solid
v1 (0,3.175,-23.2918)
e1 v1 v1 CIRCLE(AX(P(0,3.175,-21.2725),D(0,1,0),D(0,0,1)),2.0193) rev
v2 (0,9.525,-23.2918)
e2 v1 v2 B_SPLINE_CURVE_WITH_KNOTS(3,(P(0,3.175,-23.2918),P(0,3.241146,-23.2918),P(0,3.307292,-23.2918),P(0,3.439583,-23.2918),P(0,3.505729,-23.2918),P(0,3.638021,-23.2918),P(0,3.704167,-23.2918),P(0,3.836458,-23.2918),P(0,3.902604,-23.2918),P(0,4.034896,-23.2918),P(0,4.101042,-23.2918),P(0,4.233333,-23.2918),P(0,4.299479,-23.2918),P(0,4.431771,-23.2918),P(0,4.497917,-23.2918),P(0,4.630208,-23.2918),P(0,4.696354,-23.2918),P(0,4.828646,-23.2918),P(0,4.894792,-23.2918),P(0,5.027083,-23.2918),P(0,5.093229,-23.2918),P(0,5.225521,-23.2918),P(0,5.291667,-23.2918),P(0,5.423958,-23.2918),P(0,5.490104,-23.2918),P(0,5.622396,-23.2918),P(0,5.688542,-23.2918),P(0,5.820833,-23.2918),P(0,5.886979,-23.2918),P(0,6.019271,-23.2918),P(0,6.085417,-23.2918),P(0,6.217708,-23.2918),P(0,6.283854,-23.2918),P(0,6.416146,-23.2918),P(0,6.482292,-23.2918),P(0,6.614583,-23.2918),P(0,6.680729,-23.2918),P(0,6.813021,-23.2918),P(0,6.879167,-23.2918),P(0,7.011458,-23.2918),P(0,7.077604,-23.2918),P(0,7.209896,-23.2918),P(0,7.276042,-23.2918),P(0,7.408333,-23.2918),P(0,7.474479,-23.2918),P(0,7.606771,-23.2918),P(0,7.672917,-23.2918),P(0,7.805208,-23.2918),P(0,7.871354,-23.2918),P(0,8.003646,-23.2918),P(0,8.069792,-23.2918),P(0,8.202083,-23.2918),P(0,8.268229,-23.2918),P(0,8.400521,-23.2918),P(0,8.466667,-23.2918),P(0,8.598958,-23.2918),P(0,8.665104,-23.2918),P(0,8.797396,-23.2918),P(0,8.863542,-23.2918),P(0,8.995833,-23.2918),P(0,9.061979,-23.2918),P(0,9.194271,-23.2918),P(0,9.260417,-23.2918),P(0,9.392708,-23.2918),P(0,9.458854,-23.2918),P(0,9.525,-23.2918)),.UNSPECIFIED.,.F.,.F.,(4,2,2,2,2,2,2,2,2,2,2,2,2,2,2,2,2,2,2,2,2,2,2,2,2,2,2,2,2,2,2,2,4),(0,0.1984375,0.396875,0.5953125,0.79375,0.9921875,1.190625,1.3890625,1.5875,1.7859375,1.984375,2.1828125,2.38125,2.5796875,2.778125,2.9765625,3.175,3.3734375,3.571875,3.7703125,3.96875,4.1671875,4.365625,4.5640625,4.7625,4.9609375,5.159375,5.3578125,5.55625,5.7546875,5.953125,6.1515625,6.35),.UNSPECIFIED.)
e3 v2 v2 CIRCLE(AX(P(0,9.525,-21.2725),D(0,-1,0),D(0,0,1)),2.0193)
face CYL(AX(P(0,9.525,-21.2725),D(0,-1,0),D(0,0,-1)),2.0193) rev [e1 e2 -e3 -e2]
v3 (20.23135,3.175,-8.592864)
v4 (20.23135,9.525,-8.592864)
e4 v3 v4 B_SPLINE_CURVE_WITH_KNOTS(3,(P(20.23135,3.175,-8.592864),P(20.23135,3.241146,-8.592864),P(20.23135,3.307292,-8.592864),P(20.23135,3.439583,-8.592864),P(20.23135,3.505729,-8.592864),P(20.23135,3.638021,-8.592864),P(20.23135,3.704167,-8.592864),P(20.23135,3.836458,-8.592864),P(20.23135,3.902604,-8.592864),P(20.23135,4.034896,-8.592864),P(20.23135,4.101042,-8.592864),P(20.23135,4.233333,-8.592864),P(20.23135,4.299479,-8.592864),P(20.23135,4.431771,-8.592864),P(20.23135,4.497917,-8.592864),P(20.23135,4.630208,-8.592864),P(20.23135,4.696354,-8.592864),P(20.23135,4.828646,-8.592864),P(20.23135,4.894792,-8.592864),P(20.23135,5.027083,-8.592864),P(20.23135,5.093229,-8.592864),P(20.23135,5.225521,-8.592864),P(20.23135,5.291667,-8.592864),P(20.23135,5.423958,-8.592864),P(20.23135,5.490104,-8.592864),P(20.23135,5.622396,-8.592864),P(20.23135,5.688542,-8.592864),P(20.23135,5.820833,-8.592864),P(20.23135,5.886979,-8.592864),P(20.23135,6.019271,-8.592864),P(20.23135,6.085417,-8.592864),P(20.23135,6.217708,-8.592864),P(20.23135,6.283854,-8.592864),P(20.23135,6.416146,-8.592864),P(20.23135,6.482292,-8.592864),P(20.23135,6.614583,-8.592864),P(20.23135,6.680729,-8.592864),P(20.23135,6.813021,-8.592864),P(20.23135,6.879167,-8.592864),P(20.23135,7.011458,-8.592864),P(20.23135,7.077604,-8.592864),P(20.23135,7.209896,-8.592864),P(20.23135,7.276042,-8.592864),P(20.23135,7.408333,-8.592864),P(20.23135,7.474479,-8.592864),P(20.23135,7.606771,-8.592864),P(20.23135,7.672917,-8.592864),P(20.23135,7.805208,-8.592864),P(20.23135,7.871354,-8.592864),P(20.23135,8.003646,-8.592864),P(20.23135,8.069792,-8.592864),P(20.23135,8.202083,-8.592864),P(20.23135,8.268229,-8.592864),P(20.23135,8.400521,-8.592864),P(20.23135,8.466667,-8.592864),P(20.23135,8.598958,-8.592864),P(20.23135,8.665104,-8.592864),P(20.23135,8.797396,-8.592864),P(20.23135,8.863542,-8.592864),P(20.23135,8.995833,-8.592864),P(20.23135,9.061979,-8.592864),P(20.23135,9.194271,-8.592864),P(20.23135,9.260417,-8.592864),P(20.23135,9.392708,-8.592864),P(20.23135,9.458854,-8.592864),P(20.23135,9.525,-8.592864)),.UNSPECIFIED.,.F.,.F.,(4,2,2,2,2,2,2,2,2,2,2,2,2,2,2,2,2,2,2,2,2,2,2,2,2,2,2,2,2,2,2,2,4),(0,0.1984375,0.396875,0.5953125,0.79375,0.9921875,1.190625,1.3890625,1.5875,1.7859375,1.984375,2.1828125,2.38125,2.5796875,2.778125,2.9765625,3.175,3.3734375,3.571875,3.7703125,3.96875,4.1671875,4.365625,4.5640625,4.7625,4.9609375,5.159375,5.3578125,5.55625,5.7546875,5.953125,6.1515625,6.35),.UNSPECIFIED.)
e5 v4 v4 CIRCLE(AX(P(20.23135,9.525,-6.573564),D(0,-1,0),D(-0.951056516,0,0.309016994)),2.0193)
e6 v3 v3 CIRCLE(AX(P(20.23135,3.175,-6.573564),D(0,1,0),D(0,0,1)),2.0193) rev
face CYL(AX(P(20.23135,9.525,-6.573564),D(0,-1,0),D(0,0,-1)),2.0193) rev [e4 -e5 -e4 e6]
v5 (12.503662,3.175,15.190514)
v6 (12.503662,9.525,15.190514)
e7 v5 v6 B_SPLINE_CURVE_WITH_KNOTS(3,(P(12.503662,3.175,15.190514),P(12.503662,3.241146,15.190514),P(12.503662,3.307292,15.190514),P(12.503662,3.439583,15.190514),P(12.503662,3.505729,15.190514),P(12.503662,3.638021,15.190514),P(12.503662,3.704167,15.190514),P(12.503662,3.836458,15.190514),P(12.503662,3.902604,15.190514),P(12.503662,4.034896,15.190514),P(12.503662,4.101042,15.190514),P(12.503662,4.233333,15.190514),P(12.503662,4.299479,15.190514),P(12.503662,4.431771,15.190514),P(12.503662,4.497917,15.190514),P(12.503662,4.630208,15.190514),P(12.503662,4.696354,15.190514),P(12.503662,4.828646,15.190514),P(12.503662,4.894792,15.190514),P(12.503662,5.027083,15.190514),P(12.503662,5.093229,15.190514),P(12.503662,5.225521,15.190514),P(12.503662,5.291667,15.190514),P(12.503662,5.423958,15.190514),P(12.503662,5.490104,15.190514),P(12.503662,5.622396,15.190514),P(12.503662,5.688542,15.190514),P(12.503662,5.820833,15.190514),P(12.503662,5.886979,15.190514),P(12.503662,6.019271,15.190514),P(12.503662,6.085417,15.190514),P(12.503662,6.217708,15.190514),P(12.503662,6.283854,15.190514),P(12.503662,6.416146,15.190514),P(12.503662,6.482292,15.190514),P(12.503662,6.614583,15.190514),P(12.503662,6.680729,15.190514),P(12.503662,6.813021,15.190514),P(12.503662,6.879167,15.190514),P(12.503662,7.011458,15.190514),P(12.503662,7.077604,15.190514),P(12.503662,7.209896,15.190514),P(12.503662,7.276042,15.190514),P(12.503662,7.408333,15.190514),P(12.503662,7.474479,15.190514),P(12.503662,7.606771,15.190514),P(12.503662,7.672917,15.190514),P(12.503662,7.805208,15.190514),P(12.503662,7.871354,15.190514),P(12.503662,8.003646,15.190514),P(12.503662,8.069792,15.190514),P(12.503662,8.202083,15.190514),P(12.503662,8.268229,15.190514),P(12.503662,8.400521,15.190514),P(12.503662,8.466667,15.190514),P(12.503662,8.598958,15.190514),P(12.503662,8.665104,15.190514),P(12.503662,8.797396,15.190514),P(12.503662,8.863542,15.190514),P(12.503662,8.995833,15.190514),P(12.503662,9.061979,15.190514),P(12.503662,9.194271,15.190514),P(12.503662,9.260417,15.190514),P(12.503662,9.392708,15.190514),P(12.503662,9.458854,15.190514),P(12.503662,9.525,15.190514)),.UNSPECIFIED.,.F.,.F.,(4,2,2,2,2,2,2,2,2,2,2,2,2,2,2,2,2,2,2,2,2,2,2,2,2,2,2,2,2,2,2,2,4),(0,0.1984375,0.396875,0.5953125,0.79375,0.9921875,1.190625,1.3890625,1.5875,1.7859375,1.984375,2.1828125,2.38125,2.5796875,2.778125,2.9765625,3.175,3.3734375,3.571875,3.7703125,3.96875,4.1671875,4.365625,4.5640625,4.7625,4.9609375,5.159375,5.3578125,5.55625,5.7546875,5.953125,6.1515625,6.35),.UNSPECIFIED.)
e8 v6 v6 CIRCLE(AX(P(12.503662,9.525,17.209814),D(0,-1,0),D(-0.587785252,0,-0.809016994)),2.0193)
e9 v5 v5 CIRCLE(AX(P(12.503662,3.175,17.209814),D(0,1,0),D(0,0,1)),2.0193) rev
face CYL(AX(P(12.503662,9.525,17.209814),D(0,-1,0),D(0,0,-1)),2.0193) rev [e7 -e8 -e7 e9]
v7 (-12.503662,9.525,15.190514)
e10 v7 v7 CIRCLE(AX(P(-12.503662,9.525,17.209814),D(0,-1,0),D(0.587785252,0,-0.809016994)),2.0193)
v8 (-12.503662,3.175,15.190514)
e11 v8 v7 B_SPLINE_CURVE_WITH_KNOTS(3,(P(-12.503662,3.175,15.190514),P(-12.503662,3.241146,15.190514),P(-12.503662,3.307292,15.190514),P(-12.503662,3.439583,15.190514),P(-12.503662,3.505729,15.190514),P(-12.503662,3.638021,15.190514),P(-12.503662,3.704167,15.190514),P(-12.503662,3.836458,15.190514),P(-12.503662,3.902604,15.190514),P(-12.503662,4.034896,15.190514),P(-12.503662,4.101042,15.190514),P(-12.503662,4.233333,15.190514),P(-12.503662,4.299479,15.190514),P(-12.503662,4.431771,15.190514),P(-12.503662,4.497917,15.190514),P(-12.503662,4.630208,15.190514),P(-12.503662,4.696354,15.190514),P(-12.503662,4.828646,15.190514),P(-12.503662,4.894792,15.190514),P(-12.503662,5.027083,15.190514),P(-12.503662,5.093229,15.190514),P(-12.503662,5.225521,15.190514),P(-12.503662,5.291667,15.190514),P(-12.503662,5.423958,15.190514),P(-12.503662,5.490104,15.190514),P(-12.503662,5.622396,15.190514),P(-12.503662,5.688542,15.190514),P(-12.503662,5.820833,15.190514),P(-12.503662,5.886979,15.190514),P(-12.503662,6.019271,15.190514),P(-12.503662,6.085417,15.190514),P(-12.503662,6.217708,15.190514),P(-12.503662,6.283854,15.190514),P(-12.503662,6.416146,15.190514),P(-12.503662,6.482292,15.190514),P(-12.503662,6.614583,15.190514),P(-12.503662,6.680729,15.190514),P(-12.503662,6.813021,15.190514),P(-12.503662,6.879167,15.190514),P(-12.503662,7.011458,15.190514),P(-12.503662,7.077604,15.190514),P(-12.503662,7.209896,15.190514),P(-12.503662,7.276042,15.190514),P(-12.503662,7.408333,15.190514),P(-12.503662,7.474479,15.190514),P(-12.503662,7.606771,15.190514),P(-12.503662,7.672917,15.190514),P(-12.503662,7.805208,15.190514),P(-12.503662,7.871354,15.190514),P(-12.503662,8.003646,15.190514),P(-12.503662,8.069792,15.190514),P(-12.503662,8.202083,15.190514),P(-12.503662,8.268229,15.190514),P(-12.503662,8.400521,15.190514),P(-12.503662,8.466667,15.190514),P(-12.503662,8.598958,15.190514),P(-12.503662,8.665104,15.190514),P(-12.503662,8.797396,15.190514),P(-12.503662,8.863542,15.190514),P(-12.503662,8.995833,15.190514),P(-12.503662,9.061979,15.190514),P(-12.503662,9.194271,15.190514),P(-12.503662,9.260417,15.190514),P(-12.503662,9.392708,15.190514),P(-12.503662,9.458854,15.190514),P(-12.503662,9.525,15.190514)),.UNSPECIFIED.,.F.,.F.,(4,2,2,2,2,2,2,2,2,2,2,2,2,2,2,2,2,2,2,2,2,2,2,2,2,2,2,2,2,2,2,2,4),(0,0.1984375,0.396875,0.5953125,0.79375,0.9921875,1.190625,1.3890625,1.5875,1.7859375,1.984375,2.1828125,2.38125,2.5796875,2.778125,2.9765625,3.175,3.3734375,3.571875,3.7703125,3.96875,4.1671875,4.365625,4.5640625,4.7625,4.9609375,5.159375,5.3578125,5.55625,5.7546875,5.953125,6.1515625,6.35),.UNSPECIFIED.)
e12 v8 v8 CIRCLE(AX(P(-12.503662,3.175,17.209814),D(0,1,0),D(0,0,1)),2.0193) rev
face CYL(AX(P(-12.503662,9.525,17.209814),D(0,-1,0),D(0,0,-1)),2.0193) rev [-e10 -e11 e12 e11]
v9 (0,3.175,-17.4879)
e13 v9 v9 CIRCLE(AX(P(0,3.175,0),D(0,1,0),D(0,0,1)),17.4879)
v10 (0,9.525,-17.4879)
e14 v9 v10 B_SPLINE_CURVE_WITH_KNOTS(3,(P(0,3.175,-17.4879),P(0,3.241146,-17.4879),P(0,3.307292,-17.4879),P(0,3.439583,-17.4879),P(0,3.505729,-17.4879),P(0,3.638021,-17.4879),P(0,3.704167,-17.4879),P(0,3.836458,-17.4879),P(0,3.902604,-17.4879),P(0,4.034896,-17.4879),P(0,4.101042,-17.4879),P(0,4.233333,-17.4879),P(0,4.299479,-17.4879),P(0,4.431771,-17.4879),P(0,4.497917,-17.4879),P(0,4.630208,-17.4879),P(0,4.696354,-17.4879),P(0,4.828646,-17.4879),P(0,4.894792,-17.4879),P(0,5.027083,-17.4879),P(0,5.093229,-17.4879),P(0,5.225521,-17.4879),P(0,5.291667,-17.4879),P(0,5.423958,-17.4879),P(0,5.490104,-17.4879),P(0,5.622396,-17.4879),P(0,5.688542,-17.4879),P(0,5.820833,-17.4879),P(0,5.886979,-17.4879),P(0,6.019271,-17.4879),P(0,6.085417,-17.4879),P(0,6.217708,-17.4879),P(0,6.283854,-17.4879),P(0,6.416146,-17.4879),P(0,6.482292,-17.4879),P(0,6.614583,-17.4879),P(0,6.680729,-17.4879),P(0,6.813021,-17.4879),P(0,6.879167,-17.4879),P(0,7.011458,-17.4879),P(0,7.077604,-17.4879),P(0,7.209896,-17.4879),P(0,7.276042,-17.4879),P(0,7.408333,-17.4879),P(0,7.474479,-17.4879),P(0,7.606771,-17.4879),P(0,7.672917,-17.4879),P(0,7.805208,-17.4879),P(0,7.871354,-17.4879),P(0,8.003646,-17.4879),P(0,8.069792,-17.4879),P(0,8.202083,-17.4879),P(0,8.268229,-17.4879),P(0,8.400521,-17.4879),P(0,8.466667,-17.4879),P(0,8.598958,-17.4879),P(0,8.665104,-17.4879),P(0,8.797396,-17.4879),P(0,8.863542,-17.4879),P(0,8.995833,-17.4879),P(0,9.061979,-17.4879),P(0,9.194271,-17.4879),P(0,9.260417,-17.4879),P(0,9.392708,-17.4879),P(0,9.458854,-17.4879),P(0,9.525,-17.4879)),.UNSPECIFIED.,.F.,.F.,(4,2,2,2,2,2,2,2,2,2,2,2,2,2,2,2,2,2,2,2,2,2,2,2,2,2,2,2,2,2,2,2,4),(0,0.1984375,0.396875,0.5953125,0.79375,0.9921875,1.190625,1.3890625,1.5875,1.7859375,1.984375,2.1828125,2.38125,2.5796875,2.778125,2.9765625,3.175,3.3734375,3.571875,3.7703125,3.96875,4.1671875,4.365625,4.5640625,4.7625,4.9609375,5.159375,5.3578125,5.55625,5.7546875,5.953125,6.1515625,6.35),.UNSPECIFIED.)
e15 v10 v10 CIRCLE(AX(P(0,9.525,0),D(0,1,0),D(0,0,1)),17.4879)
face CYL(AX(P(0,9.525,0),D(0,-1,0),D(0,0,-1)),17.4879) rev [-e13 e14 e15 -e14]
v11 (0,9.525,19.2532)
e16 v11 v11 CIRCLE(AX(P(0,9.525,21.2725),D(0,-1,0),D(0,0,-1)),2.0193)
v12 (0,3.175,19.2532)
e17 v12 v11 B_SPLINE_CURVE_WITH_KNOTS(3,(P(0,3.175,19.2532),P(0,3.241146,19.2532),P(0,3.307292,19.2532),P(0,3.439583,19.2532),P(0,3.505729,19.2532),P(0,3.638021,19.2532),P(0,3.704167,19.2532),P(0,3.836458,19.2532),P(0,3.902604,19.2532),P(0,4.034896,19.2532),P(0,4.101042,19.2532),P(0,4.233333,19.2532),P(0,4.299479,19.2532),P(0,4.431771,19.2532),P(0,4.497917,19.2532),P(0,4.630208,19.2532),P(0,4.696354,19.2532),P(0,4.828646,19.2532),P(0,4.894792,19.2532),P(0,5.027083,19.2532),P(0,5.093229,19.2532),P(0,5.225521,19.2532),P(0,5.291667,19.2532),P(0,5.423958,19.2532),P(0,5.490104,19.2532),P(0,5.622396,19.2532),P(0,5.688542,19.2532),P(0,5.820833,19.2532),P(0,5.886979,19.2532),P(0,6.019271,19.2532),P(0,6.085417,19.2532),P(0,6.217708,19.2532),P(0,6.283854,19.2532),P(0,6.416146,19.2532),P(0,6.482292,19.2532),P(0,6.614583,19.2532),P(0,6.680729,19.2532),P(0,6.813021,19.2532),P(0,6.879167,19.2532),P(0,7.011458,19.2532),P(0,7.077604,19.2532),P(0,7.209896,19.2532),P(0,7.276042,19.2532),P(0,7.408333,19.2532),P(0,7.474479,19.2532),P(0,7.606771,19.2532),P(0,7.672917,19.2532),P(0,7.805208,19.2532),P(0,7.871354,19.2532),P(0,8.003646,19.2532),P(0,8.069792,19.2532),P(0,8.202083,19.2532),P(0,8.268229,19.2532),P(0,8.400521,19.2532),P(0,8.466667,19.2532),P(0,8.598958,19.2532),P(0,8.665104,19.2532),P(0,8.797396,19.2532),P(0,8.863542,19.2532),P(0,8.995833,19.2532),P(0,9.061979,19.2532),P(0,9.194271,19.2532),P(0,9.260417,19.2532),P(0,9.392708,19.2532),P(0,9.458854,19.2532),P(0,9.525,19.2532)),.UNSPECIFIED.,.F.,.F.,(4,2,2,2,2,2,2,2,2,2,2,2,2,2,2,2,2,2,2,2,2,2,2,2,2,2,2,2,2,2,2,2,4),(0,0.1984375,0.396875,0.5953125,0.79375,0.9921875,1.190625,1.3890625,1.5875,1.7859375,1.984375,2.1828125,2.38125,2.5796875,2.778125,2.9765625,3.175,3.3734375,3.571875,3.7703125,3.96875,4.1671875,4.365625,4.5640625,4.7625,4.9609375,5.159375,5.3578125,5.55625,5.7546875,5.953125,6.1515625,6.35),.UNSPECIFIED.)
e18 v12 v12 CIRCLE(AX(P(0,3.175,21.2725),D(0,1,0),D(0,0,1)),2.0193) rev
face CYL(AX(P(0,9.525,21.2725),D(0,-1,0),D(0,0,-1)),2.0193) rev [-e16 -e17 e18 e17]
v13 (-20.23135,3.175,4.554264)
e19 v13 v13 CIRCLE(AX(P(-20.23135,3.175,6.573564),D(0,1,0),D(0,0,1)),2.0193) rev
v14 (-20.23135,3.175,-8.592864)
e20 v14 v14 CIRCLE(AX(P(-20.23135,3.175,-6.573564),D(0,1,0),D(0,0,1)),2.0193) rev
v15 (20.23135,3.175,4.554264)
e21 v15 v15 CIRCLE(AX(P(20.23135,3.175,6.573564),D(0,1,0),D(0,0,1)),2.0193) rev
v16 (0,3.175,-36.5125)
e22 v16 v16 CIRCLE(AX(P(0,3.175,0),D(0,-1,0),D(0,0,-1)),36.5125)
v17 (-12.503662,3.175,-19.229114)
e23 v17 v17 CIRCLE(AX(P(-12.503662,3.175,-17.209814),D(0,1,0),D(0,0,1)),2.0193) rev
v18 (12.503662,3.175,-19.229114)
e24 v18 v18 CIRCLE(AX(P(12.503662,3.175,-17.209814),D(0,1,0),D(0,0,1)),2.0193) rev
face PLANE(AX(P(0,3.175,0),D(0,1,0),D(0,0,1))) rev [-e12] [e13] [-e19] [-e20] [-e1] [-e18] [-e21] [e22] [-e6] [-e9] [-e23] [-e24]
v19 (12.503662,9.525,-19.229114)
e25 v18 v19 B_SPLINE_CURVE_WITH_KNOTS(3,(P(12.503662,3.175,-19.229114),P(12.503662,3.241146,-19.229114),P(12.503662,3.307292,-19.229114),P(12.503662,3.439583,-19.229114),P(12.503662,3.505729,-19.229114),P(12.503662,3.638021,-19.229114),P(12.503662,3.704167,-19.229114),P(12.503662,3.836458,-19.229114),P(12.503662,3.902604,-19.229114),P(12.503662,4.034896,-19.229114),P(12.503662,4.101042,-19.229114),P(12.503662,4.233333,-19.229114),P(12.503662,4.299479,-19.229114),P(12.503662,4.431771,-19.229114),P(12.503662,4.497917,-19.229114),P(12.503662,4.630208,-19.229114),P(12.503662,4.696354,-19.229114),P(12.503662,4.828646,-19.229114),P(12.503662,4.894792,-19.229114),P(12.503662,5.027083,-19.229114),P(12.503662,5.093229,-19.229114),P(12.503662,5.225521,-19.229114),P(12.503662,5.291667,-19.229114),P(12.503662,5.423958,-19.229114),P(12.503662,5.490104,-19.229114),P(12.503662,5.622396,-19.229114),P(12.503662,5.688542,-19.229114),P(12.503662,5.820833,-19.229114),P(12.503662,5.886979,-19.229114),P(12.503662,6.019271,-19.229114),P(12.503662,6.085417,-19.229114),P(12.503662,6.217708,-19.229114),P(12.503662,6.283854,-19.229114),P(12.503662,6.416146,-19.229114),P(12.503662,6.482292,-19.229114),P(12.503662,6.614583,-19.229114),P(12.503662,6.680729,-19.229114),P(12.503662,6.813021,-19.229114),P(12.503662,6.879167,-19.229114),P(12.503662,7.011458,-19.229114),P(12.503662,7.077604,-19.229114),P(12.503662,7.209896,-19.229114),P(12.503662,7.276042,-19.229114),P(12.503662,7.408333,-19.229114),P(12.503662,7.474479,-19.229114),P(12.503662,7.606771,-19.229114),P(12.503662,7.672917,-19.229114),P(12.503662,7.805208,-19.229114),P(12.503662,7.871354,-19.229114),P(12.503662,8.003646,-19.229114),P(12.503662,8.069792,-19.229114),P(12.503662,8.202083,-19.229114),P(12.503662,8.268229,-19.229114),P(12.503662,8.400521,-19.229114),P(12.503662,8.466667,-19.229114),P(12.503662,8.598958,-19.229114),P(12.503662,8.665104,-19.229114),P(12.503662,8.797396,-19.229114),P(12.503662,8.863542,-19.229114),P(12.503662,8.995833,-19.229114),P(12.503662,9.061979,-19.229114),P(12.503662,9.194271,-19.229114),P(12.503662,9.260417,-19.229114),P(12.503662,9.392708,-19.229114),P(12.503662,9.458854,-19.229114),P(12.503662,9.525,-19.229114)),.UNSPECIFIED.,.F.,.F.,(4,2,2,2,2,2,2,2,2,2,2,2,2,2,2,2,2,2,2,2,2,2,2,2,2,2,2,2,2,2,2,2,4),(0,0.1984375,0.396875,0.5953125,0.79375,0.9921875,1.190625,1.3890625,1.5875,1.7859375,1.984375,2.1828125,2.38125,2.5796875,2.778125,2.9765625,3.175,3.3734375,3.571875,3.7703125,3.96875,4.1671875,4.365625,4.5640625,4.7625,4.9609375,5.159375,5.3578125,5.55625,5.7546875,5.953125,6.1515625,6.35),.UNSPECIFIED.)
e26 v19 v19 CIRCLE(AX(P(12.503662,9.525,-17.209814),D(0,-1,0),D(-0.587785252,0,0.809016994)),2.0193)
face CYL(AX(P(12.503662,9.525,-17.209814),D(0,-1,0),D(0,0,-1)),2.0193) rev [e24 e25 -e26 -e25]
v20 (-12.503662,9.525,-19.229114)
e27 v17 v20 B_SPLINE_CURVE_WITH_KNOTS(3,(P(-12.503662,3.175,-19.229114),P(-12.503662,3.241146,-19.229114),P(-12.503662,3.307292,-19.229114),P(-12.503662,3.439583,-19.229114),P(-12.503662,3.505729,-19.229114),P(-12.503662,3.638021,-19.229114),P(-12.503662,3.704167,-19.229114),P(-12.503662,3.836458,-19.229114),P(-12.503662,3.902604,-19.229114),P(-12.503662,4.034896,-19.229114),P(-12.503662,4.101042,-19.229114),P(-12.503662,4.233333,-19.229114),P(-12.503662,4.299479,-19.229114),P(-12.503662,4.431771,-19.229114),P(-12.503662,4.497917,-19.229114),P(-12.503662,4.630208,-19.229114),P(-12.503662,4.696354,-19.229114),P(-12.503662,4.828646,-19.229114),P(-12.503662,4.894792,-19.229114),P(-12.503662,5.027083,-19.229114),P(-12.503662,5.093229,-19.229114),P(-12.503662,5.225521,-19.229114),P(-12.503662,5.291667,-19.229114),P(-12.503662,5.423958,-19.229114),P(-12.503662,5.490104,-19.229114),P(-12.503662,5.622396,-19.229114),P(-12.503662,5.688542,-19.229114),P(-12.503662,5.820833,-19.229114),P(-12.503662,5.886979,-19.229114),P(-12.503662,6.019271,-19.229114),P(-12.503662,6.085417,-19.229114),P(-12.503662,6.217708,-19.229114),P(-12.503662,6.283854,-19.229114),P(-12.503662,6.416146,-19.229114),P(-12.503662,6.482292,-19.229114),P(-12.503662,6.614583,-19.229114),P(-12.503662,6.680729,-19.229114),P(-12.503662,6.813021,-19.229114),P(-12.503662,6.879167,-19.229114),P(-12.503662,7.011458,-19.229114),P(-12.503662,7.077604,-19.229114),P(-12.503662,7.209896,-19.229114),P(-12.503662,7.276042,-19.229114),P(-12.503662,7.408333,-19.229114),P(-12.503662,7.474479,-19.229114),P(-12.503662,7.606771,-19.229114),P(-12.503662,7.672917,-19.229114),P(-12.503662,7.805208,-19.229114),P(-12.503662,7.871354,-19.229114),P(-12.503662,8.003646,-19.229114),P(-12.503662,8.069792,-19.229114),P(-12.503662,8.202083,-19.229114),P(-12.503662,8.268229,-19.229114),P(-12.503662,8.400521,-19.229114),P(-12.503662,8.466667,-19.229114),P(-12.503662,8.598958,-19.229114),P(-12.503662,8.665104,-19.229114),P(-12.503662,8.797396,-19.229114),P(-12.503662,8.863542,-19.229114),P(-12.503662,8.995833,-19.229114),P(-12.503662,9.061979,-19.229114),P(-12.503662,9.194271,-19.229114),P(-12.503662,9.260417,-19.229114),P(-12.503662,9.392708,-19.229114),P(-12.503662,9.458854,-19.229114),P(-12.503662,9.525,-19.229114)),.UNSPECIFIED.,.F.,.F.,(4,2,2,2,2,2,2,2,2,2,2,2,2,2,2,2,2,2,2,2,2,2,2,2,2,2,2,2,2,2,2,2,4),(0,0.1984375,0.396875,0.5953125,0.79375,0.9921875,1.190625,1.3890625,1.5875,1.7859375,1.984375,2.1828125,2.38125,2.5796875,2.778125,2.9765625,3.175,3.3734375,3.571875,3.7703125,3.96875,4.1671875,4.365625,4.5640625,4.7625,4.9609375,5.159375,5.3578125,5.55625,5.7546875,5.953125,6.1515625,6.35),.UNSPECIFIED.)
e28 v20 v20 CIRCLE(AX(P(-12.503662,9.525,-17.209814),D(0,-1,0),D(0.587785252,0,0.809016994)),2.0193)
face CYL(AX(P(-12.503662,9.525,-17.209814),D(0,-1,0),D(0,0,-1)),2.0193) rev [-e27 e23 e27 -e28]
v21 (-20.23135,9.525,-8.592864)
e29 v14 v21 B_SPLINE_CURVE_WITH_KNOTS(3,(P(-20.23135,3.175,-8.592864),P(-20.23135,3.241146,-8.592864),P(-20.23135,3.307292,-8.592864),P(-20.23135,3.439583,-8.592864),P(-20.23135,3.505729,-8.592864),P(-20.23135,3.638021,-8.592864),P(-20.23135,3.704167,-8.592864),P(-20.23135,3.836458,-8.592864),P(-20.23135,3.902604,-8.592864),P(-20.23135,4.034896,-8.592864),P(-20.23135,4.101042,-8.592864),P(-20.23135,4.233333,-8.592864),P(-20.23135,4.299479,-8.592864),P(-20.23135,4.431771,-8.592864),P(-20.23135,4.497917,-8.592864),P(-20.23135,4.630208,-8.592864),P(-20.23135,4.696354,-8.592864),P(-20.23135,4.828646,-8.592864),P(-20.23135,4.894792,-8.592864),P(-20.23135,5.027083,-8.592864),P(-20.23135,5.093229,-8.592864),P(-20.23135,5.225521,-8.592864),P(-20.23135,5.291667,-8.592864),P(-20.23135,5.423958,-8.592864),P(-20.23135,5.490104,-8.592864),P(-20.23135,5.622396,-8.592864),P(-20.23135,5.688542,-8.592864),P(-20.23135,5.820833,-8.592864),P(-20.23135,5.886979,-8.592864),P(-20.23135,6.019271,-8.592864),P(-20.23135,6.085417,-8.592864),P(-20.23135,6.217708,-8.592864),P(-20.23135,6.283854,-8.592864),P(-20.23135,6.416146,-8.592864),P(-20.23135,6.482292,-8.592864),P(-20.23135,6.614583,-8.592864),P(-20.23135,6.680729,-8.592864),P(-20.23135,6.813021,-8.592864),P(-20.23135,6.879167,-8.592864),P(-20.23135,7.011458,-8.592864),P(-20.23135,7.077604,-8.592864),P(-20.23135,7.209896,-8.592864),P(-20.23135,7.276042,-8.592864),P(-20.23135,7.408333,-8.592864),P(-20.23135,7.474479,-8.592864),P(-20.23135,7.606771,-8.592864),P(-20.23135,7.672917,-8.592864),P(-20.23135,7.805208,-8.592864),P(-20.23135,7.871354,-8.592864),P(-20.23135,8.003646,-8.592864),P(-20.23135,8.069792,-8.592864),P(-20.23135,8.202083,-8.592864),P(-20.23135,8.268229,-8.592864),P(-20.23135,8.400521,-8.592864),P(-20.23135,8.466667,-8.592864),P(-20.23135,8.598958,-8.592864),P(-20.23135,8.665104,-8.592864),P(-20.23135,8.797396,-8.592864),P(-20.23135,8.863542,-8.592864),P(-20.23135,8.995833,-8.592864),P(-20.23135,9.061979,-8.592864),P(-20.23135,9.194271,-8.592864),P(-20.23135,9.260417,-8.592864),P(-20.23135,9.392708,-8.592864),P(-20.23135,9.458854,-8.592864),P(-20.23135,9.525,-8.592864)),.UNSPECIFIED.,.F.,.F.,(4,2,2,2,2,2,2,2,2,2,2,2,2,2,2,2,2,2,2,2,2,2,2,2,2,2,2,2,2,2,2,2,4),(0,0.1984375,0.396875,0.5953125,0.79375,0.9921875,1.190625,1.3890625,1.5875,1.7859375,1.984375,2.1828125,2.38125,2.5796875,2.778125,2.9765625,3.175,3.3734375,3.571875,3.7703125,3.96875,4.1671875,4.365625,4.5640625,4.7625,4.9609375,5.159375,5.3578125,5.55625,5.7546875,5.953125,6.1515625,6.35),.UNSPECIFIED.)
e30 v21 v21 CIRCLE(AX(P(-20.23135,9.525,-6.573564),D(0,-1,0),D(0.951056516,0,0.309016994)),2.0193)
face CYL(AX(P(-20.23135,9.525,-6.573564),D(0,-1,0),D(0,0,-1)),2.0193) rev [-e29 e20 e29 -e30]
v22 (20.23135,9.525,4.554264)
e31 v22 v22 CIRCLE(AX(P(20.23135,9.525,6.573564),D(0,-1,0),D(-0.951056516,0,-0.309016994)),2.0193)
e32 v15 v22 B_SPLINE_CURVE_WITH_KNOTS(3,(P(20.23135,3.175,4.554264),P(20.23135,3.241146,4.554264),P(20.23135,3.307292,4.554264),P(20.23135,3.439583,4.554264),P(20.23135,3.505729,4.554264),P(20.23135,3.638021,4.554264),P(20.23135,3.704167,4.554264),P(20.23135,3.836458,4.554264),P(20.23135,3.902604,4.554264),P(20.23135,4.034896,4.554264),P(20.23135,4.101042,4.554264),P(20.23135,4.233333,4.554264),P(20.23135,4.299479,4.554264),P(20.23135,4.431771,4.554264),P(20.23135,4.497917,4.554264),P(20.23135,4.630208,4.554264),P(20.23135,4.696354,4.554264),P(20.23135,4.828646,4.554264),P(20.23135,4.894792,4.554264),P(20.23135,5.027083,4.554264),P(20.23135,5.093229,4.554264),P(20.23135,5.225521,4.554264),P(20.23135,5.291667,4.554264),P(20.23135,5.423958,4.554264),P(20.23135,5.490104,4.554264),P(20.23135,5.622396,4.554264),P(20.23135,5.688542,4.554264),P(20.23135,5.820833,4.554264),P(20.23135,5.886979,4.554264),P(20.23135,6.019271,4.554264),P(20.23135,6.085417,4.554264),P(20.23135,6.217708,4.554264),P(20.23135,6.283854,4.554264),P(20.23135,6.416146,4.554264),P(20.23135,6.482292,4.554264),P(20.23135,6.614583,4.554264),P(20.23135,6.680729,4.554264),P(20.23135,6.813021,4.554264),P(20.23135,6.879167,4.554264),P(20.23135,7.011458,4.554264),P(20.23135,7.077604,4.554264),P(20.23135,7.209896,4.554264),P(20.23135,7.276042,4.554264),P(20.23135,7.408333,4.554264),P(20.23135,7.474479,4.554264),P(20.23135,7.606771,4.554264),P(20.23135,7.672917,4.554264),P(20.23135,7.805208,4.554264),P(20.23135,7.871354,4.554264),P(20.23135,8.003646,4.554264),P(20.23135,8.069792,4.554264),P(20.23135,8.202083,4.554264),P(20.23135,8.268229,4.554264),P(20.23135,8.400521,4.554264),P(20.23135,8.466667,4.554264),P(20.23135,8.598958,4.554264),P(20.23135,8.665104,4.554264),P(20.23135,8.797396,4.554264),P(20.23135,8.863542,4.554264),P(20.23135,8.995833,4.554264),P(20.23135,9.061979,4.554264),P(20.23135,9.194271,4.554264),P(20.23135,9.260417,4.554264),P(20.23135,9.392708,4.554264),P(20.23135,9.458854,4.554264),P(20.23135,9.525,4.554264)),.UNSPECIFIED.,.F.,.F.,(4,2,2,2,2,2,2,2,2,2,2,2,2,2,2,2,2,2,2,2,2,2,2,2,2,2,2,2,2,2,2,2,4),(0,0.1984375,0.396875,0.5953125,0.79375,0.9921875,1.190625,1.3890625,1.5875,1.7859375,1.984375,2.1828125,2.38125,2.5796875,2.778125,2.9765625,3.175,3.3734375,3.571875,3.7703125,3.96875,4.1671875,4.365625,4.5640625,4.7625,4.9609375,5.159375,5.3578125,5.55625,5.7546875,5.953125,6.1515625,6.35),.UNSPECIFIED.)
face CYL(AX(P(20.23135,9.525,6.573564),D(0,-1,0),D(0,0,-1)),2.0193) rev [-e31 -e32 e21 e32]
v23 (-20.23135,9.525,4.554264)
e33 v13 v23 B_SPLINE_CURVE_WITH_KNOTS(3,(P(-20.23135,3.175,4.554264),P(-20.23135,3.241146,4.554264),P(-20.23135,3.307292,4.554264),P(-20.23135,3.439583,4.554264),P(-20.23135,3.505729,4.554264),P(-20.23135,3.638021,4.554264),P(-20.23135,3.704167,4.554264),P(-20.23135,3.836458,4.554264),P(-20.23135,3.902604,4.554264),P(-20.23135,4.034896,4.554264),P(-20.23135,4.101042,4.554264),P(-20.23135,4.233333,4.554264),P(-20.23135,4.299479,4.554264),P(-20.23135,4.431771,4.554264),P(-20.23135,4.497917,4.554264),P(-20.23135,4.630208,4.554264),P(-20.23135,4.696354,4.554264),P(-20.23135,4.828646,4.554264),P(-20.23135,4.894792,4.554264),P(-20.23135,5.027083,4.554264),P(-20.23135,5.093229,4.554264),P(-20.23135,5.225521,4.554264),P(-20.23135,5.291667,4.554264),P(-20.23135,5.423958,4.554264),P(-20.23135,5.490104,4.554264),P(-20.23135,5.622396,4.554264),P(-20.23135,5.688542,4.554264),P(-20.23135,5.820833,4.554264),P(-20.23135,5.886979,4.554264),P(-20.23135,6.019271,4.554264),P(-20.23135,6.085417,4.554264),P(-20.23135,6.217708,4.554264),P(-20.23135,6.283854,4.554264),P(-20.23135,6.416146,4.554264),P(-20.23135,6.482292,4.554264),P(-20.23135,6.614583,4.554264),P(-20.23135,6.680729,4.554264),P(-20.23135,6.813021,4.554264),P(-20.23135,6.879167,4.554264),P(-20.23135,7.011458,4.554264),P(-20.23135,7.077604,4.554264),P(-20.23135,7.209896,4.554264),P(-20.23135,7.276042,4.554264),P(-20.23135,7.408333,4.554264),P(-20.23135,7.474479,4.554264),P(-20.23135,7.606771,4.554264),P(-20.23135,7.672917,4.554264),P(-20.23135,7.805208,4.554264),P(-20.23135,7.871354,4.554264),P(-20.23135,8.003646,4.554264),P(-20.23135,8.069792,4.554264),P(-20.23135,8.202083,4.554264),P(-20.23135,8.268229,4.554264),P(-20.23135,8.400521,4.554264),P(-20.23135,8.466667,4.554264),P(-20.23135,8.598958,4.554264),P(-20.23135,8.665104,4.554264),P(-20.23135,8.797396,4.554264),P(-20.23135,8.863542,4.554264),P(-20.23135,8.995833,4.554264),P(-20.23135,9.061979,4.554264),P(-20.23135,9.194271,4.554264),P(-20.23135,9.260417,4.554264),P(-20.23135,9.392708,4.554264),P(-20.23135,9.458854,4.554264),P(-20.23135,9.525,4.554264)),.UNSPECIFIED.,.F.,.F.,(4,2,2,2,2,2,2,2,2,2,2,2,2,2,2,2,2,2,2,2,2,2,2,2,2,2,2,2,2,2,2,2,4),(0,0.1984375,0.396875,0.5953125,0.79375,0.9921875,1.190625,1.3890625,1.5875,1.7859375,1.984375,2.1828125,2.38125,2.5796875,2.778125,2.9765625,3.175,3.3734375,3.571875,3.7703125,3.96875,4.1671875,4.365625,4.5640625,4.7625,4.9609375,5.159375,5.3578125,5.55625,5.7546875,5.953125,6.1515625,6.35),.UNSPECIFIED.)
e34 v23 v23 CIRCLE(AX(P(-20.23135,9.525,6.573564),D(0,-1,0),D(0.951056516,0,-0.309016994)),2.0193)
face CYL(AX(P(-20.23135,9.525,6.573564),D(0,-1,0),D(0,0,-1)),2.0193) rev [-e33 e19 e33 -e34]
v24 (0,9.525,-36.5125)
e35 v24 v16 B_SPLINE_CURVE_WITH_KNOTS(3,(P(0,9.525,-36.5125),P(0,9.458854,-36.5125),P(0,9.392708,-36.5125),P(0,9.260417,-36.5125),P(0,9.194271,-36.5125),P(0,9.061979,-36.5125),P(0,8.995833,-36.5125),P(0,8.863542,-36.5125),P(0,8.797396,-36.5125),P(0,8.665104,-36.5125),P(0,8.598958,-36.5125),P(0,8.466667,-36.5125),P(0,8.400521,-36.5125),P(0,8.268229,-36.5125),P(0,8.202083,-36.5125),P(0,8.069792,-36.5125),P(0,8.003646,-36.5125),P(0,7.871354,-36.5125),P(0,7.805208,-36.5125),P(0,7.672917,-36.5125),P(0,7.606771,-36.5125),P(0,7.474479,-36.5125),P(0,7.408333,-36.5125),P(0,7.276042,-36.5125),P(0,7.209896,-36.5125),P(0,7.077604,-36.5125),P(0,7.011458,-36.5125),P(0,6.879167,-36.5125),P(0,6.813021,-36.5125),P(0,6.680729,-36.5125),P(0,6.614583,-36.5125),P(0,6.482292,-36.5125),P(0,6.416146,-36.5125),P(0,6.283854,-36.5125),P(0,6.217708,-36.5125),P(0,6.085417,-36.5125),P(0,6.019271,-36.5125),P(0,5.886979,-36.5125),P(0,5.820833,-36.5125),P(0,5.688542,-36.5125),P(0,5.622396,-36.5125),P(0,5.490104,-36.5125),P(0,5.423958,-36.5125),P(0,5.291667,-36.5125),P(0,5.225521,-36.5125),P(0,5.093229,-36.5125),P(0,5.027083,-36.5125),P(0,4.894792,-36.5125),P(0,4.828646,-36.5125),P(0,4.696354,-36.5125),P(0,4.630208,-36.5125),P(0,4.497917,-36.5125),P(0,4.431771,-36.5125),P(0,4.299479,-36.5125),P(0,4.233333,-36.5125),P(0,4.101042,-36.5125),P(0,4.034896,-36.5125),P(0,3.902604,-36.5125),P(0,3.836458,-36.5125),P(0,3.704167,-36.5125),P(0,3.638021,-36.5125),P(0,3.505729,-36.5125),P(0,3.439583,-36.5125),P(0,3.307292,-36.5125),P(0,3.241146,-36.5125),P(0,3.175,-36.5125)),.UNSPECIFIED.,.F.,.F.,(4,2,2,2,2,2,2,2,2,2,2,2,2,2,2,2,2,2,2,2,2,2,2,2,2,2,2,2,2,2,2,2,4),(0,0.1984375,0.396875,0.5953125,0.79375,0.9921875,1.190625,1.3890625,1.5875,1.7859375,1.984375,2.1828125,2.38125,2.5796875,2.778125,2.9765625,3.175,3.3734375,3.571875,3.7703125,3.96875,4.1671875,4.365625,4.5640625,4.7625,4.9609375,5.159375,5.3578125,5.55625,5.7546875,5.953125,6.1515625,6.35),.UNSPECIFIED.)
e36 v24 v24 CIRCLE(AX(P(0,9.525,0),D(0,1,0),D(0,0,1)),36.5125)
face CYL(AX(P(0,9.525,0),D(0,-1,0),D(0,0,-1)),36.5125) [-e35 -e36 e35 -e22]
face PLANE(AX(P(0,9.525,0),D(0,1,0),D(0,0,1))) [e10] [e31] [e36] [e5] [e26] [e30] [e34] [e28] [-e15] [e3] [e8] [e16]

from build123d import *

# Parameters (mm, degrees)
SKETCH1_R            = 36.5125
SKETCH1_R_2          = 17.4879
BOSS_EXTRUDE1_DEPTH  = 9.525
SKETCH2_R            = 17.4879
SKETCH2_R_2          = 12.7
BOSS_EXTRUDE2_DEPTH  = 9.525
SKETCH3_R            = 2.0193
CUT_EXTRUDE1_DEPTH   = 56.038421239
SKETCH4_W            = 4.7625
SKETCH4_H            = 9.525
CUT_EXTRUDE2_START   = -12.7
SKETCH5_R            = 2.4892
CUT_EXTRUDE2_DEPTH   = 12.7
CIRPATTERN1_COUNT    = 10
SPLIT1_START         = -9.525
SPLIT1_OUTLINE_R     = 36.5125
SPLIT1_OUTLINE_R_2   = 2.4892
SPLIT1_OUTLINE_R_3   = 12.7
SPLIT1_DEPTH         = 12.7
SPLIT1_START_2       = -6.35
SPLIT1_2_OUTLINE_R   = 31.75
SPLIT1_2_OUTLINE_R_2 = 2.4892
SPLIT1_2_OUTLINE_R_3 = 12.7
SPLIT1_2_DEPTH       = 6.35
SPLIT1_3_OUTLINE_R   = 31.75
SPLIT1_3_OUTLINE_R_2 = 2.4892
SPLIT1_3_OUTLINE_R_3 = 17.4879
SPLIT1_3_DEPTH       = 3.175
SPLIT1_4_OUTLINE_R   = 36.5125
SPLIT1_4_OUTLINE_R_2 = 2.4892
SPLIT1_4_OUTLINE_R_3 = 12.7
SPLIT1_4_DEPTH       = 3.175


# Read off the part's stored shape, not the designer's step: Split1
with BuildPart() as part:
    # Sketch1 → Boss-Extrude1 (new, symmetric)
    with BuildSketch(Plane(origin=(0, 0, 0), x_dir=(1, 0, 0), z_dir=(0, 1, 0))):
        with Locations(Location((0, 0, 0), (0, 0, 90))):
            Circle(SKETCH1_R)
        with Locations(Location((0, 0, 0), (0, 0, 90))):
            Circle(SKETCH1_R_2, mode=Mode.SUBTRACT)
    extrude(amount=BOSS_EXTRUDE1_DEPTH, both=True)

    # Sketch2 → Boss-Extrude2 (add)
    with BuildSketch(Plane.XZ.offset(9.525)):
        with Locations(Location((0, 0, 0), (0, 0, 270))):
            Circle(SKETCH2_R)
        with Locations(Location((0, 0, 0), (0, 0, 270))):
            Circle(SKETCH2_R_2, mode=Mode.SUBTRACT)
    extrude(amount=-BOSS_EXTRUDE2_DEPTH)

    # Sketch3 → Cut-Extrude1 (cut, through all)
    with BuildSketch(Plane.XZ.offset(9.525)):
        with Locations(Location((0, 21.2725, 0), (0, 0, 270))):
            Circle(SKETCH3_R)
    cut_extrude1 = extrude(amount=-CUT_EXTRUDE1_DEPTH, mode=Mode.SUBTRACT)

    # Sketch4 → Cut-Revolve1 (revolve, cut)
    with BuildSketch(Plane(origin=(0, 0, 0), x_dir=(0, 0, -1), z_dir=(1, 0, 0)), mode=Mode.PRIVATE) as cut_revolve1_sk:
        with Locations((-34.13125, -1.5875)):
            Rectangle(SKETCH4_W, SKETCH4_H)
    revolve(cut_revolve1_sk.sketch.rotate(Axis((0, 0, 0), (0, 1, 0)), 180), axis=Axis((0, 0, 0), (0, 1, 0)), mode=Mode.SUBTRACT)

    # Sketch5 → Cut-Extrude2 (cut)
    with BuildSketch(Plane.XZ.offset(9.525).offset(CUT_EXTRUDE2_START)):
        with Locations(Location((0, 21.2725, 0), (0, 0, 270))):
            Circle(SKETCH5_R)
    cut_extrude2 = extrude(amount=CUT_EXTRUDE2_DEPTH, mode=Mode.SUBTRACT)

    # CirPattern1: Cut-Extrude1, Cut-Extrude2 ×10 about axis
    cirpattern1_axis = Axis((0, 0, 0), (0, 1, 0))
    add([cut_extrude1.rotate(cirpattern1_axis, i * 360 / CIRPATTERN1_COUNT) for i in range(1, CIRPATTERN1_COUNT)], mode=Mode.SUBTRACT)
    add([cut_extrude2.rotate(cirpattern1_axis, i * 360 / CIRPATTERN1_COUNT) for i in range(1, CIRPATTERN1_COUNT)], mode=Mode.SUBTRACT)

    # Split1 outline → Split1 (cut)
    with BuildSketch(Plane(origin=(0, 0, 0), x_dir=(1, 0, 0), z_dir=(0, 1, 0)).offset(SPLIT1_START)):
        Circle(SPLIT1_OUTLINE_R)
        with Locations((0, 21.2725)):
            Circle(SPLIT1_OUTLINE_R_2, mode=Mode.SUBTRACT)
        with Locations((-20.231349743, -6.573564013)):
            Circle(SPLIT1_OUTLINE_R_2, mode=Mode.SUBTRACT)
        with Locations((-12.503661779, -17.209814013)):
            Circle(SPLIT1_OUTLINE_R_2, mode=Mode.SUBTRACT)
        with Locations((0, -21.2725)):
            Circle(SPLIT1_OUTLINE_R_2, mode=Mode.SUBTRACT)
        with Locations((12.503661779, -17.209814013)):
            Circle(SPLIT1_OUTLINE_R_2, mode=Mode.SUBTRACT)
        with Locations((20.231349743, -6.573564013)):
            Circle(SPLIT1_OUTLINE_R_2, mode=Mode.SUBTRACT)
        with Locations((-20.231349743, 6.573564013)):
            Circle(SPLIT1_OUTLINE_R_2, mode=Mode.SUBTRACT)
        with Locations((-12.503661779, 17.209814013)):
            Circle(SPLIT1_OUTLINE_R_2, mode=Mode.SUBTRACT)
        with Locations((12.503661779, 17.209814013)):
            Circle(SPLIT1_OUTLINE_R_2, mode=Mode.SUBTRACT)
        with Locations((20.231349743, 6.573564013)):
            Circle(SPLIT1_OUTLINE_R_2, mode=Mode.SUBTRACT)
        Circle(SPLIT1_OUTLINE_R_3, mode=Mode.SUBTRACT)
    extrude(amount=SPLIT1_DEPTH, mode=Mode.SUBTRACT)


with BuildPart() as body_2:
    # Split1 2 outline → Split1 2 (new body)
    with BuildSketch(Plane(origin=(0, 0, 0), x_dir=(1, 0, 0), z_dir=(0, 1, 0)).offset(SPLIT1_START_2)):
        Circle(SPLIT1_2_OUTLINE_R)
        with Locations((-12.503661779, -17.209814013)):
            Circle(SPLIT1_2_OUTLINE_R_2, mode=Mode.SUBTRACT)
        with Locations((-20.231349743, -6.573564013)):
            Circle(SPLIT1_2_OUTLINE_R_2, mode=Mode.SUBTRACT)
        with Locations((0, -21.2725)):
            Circle(SPLIT1_2_OUTLINE_R_2, mode=Mode.SUBTRACT)
        with Locations((12.503661779, -17.209814013)):
            Circle(SPLIT1_2_OUTLINE_R_2, mode=Mode.SUBTRACT)
        with Locations((20.231349743, -6.573564013)):
            Circle(SPLIT1_2_OUTLINE_R_2, mode=Mode.SUBTRACT)
        with Locations((-20.231349743, 6.573564013)):
            Circle(SPLIT1_2_OUTLINE_R_2, mode=Mode.SUBTRACT)
        with Locations((-12.503661779, 17.209814013)):
            Circle(SPLIT1_2_OUTLINE_R_2, mode=Mode.SUBTRACT)
        Circle(SPLIT1_2_OUTLINE_R_3, mode=Mode.SUBTRACT)
        with Locations((20.231349743, 6.573564013)):
            Circle(SPLIT1_2_OUTLINE_R_2, mode=Mode.SUBTRACT)
        with Locations((0, 21.2725)):
            Circle(SPLIT1_2_OUTLINE_R_2, mode=Mode.SUBTRACT)
        with Locations((12.503661779, 17.209814013)):
            Circle(SPLIT1_2_OUTLINE_R_2, mode=Mode.SUBTRACT)
    extrude(amount=SPLIT1_2_DEPTH)


with BuildPart() as body_3:
    # Split1 3 outline → Split1 3 (new body)
    with BuildSketch(Plane(origin=(0, 0, 0), x_dir=(1, 0, 0), z_dir=(0, 1, 0))):
        Circle(SPLIT1_3_OUTLINE_R)
        with Locations((-12.503661779, -17.209814013)):
            Circle(SPLIT1_3_OUTLINE_R_2, mode=Mode.SUBTRACT)
        with Locations((-20.231349743, -6.573564013)):
            Circle(SPLIT1_3_OUTLINE_R_2, mode=Mode.SUBTRACT)
        with Locations((0, -21.2725)):
            Circle(SPLIT1_3_OUTLINE_R_2, mode=Mode.SUBTRACT)
        with Locations((12.503661779, -17.209814013)):
            Circle(SPLIT1_3_OUTLINE_R_2, mode=Mode.SUBTRACT)
        with Locations((20.231349743, -6.573564013)):
            Circle(SPLIT1_3_OUTLINE_R_2, mode=Mode.SUBTRACT)
        with Locations((-20.231349743, 6.573564013)):
            Circle(SPLIT1_3_OUTLINE_R_2, mode=Mode.SUBTRACT)
        with Locations((-12.503661779, 17.209814013)):
            Circle(SPLIT1_3_OUTLINE_R_2, mode=Mode.SUBTRACT)
        Circle(SPLIT1_3_OUTLINE_R_3, mode=Mode.SUBTRACT)
        with Locations((20.231349743, 6.573564013)):
            Circle(SPLIT1_3_OUTLINE_R_2, mode=Mode.SUBTRACT)
        with Locations((0, 21.2725)):
            Circle(SPLIT1_3_OUTLINE_R_2, mode=Mode.SUBTRACT)
        with Locations((12.503661779, 17.209814013)):
            Circle(SPLIT1_3_OUTLINE_R_2, mode=Mode.SUBTRACT)
    extrude(amount=SPLIT1_3_DEPTH)


with BuildPart() as body_4:
    # Split1 4 outline → Split1 4 (new body)
    with BuildSketch(Plane(origin=(0, 0, 0), x_dir=(1, 0, 0), z_dir=(0, 1, 0)).offset(SPLIT1_START)):
        Circle(SPLIT1_4_OUTLINE_R)
        with Locations((-20.231349743, -6.573564013)):
            Circle(SPLIT1_4_OUTLINE_R_2, mode=Mode.SUBTRACT)
        with Locations((-12.503661779, -17.209814013)):
            Circle(SPLIT1_4_OUTLINE_R_2, mode=Mode.SUBTRACT)
        with Locations((0, -21.2725)):
            Circle(SPLIT1_4_OUTLINE_R_2, mode=Mode.SUBTRACT)
        with Locations((12.503661779, -17.209814013)):
            Circle(SPLIT1_4_OUTLINE_R_2, mode=Mode.SUBTRACT)
        with Locations((20.231349743, -6.573564013)):
            Circle(SPLIT1_4_OUTLINE_R_2, mode=Mode.SUBTRACT)
        with Locations((-20.231349743, 6.573564013)):
            Circle(SPLIT1_4_OUTLINE_R_2, mode=Mode.SUBTRACT)
        with Locations((-12.503661779, 17.209814013)):
            Circle(SPLIT1_4_OUTLINE_R_2, mode=Mode.SUBTRACT)
        Circle(SPLIT1_4_OUTLINE_R_3, mode=Mode.SUBTRACT)
        with Locations((12.503661779, 17.209814013)):
            Circle(SPLIT1_4_OUTLINE_R_2, mode=Mode.SUBTRACT)
        with Locations((20.231349743, 6.573564013)):
            Circle(SPLIT1_4_OUTLINE_R_2, mode=Mode.SUBTRACT)
        with Locations((0, 21.2725)):
            Circle(SPLIT1_4_OUTLINE_R_2, mode=Mode.SUBTRACT)
    extrude(amount=SPLIT1_4_DEPTH)


solid = part.part
